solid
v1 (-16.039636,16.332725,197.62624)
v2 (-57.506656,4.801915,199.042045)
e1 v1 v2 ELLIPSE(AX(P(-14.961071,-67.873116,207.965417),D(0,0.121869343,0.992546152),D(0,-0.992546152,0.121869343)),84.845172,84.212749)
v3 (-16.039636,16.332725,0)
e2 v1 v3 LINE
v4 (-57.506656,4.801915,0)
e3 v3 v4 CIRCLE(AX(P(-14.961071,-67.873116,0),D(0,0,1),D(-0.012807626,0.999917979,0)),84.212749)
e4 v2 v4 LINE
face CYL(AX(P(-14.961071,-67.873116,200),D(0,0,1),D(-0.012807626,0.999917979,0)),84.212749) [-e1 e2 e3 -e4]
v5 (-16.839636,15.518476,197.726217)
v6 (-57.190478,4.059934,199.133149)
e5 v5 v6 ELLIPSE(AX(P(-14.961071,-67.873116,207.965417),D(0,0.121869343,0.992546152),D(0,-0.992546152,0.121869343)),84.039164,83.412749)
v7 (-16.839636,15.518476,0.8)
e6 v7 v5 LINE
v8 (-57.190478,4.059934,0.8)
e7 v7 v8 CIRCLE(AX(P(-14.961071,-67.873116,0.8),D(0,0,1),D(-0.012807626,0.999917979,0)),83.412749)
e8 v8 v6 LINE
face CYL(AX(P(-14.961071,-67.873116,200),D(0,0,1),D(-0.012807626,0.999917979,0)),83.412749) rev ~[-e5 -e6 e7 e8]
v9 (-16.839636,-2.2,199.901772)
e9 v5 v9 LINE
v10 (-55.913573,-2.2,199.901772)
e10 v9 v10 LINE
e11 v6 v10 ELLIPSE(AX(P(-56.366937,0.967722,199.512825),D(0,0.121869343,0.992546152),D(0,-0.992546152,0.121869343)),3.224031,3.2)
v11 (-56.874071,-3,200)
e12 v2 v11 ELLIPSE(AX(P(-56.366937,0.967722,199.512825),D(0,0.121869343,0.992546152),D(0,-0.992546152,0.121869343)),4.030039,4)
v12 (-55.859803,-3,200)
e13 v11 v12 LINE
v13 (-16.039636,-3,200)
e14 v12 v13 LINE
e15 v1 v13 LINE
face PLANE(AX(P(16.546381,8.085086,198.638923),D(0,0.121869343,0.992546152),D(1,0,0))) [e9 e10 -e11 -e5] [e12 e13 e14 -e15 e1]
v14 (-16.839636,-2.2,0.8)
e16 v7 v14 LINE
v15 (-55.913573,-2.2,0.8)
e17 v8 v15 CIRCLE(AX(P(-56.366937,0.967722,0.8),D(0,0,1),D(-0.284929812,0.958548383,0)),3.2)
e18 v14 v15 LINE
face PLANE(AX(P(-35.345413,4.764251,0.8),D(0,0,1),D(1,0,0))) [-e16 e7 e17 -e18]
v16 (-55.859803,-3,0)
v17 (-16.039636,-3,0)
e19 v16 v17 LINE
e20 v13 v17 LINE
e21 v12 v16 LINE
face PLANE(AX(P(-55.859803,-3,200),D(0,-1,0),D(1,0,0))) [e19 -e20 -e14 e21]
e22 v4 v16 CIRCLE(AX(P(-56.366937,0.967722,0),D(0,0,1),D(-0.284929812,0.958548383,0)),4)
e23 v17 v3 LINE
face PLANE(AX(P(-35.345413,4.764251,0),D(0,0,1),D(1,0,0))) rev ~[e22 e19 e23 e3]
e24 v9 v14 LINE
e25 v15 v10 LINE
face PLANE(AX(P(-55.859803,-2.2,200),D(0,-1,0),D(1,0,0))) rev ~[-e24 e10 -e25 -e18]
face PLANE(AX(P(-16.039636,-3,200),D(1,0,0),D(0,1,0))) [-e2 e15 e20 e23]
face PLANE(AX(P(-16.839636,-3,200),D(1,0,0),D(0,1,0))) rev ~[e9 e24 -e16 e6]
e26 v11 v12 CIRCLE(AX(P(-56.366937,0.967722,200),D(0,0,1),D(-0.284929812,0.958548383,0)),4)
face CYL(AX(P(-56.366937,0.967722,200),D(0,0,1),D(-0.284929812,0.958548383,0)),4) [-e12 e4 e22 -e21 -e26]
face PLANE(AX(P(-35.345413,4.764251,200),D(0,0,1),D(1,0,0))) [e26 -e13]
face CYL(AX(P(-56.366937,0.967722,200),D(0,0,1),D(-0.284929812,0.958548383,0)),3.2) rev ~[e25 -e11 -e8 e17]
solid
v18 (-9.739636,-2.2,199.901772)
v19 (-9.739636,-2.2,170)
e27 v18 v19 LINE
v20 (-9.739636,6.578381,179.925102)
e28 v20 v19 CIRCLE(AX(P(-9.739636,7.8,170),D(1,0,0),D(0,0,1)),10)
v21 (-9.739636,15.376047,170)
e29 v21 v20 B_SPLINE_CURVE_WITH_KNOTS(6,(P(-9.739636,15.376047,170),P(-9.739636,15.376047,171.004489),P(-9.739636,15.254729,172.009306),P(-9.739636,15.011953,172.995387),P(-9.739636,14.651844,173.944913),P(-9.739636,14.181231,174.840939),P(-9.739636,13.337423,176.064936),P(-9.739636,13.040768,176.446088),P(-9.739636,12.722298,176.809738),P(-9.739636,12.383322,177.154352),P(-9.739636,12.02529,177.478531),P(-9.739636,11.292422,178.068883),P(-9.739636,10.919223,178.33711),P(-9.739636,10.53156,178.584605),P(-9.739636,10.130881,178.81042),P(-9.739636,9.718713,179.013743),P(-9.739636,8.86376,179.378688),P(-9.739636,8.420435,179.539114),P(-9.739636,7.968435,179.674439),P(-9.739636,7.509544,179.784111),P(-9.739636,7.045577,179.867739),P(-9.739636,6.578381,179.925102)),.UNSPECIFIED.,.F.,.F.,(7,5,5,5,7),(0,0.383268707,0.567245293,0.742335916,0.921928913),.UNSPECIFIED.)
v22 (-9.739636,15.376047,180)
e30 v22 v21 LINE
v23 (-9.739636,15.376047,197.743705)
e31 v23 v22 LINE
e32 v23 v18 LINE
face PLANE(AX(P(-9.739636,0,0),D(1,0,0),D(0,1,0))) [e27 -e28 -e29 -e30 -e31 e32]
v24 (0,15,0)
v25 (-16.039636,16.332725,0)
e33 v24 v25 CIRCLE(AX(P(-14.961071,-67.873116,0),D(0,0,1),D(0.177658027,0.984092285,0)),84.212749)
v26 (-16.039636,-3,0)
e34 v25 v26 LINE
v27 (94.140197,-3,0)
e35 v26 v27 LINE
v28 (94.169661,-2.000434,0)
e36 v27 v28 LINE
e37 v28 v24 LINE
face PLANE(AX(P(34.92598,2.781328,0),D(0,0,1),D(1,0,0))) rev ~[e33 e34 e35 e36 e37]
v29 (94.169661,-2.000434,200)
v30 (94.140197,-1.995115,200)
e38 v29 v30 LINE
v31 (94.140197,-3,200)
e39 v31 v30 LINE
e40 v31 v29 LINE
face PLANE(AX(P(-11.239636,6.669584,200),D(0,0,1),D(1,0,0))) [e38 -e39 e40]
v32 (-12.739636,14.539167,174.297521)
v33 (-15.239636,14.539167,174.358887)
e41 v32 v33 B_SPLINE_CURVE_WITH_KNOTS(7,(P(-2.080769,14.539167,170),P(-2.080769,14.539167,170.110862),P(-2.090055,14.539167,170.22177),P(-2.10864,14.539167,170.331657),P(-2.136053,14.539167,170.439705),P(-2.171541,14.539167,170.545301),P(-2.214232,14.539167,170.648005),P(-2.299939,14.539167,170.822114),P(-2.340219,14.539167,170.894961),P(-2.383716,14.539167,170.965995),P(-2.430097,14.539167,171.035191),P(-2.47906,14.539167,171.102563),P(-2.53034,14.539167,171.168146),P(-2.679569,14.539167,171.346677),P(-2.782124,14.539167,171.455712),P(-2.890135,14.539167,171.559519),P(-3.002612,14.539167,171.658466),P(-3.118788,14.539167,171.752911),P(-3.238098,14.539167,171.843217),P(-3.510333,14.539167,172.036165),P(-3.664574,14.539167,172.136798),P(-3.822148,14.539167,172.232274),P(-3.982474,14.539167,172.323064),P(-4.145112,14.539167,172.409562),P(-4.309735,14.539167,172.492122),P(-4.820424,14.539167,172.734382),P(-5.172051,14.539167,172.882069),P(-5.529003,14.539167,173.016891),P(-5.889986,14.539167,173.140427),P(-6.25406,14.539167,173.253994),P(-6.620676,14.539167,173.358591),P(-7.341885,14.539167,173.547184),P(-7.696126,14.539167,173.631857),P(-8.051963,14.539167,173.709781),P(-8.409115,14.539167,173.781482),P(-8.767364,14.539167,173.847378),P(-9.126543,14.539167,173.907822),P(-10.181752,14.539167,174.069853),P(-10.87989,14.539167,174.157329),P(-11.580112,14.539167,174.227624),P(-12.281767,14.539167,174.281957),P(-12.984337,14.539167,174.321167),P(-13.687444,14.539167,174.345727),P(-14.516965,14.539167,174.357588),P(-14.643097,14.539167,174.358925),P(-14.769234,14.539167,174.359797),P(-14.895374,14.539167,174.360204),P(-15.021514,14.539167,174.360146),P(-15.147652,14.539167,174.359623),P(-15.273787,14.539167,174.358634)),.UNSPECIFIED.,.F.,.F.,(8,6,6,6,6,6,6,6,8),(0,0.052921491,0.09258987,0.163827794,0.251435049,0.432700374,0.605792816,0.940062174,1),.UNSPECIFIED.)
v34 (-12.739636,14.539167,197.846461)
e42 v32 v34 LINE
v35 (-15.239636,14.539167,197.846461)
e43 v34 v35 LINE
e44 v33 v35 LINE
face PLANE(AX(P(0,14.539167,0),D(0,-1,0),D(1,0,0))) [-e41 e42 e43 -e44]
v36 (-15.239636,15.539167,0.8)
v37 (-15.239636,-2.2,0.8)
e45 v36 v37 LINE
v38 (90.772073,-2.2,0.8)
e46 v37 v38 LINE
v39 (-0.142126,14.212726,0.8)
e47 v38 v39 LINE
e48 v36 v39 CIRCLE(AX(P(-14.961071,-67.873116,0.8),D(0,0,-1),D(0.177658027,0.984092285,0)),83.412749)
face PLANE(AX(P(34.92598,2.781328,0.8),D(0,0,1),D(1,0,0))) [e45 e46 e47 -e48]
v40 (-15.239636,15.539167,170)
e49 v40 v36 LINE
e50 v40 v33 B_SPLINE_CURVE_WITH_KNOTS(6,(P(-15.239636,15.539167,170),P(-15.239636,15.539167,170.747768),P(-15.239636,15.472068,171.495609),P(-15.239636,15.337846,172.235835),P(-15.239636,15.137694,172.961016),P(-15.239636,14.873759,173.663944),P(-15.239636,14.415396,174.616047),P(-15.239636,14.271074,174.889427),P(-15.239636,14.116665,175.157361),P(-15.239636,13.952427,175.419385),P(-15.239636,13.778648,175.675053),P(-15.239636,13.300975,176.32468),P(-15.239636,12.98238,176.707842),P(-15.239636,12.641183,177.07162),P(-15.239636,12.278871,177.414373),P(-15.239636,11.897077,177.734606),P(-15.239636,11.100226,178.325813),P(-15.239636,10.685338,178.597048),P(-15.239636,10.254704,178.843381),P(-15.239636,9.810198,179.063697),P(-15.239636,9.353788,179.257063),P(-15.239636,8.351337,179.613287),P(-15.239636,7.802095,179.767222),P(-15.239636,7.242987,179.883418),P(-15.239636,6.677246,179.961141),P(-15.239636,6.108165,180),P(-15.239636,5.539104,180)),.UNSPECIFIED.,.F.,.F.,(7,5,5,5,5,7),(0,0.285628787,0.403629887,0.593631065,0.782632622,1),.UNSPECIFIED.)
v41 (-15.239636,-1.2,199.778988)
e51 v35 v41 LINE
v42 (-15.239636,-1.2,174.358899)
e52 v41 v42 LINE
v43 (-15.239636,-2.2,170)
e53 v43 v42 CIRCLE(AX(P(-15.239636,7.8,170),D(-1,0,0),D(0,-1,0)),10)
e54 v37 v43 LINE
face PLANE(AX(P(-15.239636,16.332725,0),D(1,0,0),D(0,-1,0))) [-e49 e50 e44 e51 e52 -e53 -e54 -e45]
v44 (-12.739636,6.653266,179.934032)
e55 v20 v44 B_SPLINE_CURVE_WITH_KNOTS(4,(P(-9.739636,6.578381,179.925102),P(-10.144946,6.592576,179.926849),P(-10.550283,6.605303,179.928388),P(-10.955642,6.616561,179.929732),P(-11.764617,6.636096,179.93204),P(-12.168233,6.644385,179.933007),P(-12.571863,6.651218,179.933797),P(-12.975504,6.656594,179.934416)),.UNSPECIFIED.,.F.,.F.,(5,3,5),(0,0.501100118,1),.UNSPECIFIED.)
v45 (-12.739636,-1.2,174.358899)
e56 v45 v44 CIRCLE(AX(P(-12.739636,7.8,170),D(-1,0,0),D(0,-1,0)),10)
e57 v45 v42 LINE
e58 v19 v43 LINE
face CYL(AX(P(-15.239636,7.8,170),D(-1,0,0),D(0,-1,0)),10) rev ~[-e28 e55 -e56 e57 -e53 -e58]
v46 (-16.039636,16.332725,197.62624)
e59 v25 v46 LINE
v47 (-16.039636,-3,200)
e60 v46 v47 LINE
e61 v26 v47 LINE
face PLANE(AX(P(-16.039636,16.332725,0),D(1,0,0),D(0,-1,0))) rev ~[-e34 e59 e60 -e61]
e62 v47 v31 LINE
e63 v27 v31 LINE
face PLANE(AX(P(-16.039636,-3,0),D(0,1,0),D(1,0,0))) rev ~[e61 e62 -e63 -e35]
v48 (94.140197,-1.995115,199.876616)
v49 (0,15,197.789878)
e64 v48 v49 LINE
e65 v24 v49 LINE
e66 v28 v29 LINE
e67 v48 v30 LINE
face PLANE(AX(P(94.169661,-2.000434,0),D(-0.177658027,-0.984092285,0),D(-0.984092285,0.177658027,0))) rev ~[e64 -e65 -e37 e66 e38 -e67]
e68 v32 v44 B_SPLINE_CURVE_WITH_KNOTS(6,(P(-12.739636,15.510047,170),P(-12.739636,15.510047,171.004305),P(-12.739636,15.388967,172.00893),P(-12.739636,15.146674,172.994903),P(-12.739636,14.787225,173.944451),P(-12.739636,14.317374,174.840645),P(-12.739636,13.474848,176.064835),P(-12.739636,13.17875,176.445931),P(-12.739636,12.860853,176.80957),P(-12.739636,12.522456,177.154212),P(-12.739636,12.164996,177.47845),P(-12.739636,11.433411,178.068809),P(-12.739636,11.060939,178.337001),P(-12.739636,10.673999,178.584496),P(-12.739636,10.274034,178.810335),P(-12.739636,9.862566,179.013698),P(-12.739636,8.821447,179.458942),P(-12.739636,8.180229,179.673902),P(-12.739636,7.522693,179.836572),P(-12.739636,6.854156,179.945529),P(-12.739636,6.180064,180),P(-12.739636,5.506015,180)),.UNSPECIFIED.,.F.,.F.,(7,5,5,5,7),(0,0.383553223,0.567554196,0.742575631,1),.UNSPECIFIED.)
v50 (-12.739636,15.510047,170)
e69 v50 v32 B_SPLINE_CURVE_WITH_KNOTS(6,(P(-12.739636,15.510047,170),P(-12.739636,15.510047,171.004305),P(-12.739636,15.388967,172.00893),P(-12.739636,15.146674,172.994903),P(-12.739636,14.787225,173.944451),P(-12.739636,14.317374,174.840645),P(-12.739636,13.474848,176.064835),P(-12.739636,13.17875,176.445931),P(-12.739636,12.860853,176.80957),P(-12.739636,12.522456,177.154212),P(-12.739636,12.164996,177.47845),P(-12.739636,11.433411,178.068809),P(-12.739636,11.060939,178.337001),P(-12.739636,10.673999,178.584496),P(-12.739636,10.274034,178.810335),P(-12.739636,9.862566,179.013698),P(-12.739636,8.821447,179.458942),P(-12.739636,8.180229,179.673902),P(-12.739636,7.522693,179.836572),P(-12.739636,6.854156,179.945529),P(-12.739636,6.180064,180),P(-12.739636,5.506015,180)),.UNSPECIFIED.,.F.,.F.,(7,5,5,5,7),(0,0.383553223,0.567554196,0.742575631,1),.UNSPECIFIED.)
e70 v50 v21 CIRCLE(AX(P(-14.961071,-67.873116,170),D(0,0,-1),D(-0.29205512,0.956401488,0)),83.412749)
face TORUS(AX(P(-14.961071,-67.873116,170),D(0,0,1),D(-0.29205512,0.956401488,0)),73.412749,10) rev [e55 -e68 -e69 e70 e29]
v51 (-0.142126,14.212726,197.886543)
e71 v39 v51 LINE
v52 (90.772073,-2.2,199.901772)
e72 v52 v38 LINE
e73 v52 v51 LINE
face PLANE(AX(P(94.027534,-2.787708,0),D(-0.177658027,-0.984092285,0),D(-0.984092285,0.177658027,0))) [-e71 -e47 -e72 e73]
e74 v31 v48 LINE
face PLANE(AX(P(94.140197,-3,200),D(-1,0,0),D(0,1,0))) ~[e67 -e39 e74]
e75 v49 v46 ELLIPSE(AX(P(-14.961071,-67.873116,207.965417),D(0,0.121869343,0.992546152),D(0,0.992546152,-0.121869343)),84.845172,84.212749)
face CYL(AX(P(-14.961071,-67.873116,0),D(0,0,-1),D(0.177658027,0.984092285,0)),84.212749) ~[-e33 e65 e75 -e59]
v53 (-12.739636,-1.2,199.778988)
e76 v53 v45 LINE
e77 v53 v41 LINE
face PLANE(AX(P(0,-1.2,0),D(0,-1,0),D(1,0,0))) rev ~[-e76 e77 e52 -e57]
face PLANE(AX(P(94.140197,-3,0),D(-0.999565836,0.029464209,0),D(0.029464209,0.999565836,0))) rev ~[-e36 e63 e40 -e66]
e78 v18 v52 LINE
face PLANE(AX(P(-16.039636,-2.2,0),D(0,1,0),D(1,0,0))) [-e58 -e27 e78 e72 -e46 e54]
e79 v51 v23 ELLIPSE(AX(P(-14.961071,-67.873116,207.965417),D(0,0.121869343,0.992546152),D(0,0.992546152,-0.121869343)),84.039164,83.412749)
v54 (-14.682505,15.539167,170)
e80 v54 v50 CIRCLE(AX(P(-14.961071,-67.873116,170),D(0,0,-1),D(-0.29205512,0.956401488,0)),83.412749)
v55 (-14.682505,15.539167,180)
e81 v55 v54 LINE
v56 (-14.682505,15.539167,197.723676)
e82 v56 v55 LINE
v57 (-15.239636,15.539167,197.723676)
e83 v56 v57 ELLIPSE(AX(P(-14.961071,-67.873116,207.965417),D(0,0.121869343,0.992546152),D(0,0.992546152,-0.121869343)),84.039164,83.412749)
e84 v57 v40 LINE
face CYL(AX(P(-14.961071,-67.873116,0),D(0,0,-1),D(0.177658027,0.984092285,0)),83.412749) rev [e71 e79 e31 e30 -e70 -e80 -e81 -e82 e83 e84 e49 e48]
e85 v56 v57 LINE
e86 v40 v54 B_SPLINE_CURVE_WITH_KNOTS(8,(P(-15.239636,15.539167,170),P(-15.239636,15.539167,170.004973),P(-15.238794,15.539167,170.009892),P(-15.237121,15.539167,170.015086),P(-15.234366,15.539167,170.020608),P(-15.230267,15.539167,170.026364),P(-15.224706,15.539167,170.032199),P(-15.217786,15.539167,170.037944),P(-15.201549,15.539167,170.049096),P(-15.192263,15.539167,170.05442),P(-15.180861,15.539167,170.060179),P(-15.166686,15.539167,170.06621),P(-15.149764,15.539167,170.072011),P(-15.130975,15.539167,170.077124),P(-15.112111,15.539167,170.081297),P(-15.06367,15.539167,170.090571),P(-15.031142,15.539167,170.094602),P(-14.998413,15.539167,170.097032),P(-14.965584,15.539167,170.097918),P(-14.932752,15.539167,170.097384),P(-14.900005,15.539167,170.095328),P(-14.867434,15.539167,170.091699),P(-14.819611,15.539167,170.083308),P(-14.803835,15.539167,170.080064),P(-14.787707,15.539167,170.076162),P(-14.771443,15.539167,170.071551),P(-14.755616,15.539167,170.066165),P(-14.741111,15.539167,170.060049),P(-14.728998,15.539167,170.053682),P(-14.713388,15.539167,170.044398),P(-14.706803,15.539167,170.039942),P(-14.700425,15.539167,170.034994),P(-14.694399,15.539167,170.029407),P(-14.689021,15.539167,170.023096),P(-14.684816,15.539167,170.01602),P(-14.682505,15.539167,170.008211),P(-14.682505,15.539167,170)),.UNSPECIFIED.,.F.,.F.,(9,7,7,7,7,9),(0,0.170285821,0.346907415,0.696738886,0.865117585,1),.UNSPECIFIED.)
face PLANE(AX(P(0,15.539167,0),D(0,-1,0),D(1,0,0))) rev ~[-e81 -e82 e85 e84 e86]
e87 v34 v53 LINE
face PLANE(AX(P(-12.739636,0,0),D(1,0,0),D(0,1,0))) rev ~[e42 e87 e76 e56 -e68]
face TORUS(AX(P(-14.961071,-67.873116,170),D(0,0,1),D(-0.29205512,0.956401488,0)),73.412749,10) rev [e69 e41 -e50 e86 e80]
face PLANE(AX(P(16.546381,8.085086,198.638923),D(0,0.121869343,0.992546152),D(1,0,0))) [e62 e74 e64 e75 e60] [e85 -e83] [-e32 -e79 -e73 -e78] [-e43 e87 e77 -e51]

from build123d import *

# Parameters (mm, degrees)
F1_DEPTH     = 200
F3_DEPTH     = 200
F4_T         = -0.8
F4_2_T       = -0.8
F5_W         = 2.5
F5_H         = 1
F6_DEPTH     = 20
F7_T4_DEPTH  = 5.5
F7_T9_DEPTH  = 30.5
F7_T14_ANGLE = 37.7423343373
F7_T20_ANGLE = 37.7423343373
F8_W         = 155.1876314091
F8_H         = 22.3366669118
F9_ANGLE     = 7


# Not quite as in the source:
# - a fillet or chamfer that OpenCascade refuses, or shapes differently, is made with other operations: its cross-section is extruded or revolved along the edge and cut away or added


with BuildPart() as f1:
    # F0 (on Top) → F1 (new body)
    with BuildSketch(Plane.XY):
        with BuildLine():
            Line((94.1401966023, -3), (94.1696608117, -2.0004341641))
            Line((94.1696608117, -2.0004341641), (0, 15))
            ThreePointArc((0, 15), (-7.9879059152, 16.0504323354), (-16.0396361483, 16.3327251865))
            Line((-16.0396361483, 16.3327251865), (-16.0396361483, -3))
            Line((-16.0396361483, -3), (94.1401966023, -3))
        make_face()
    extrude(amount=F1_DEPTH)

    # F4
    f4_openings = [f1.faces().sort_by_distance(p)[0] for p in [
        (22.614044, 3.891358, 200),
    ]]
    offset(amount=F4_T, openings=f4_openings)

    # F5 (on face) → F6 (join)
    with BuildSketch(Plane.XY.offset(200)):
        Polygon((-12.7396361483, -1.2), (-12.7396361483, -2.2), (-9.7396361483, -2.2), (-9.7396361483, 15.5391672506), (-12.7396361483, 15.5391672506), (-12.7396361483, 14.5391672506), align=None)
        with Locations((-13.9896361483, -1.7)):
            Rectangle(F5_W, F5_H)
        with Locations((-13.9896361483, 15.0391672506)):
            Rectangle(F5_W, F5_H)
    extrude(amount=-F6_DEPTH)

    # F7: fillet of radius 10 on 2 edges, made by hand


with BuildPart() as f3:
    # F2 (on face) → F3 (new body)
    with BuildSketch(Plane.XY.offset(200)):
        with BuildLine():
            Line((-16.0396361483, -3), (-16.0396361483, 16.3327251865))
            ThreePointArc((-16.0396361483, 16.3327251865), (-37.5222437907, 13.2612199418), (-57.5066562048, 4.8019152395))
            ThreePointArc((-57.5066562048, 4.8019152395), (-60.2806962129, 0.1415930949), (-55.8598033977, -3))
            Line((-55.8598033977, -3), (-16.0396361483, -3))
        make_face()
    extrude(amount=-F3_DEPTH)

    # F4#2
    f4_2_openings = [f3.faces().sort_by_distance(p)[0] for p in [
        (-34.83961, 5.023506, 200),
    ]]
    offset(amount=F4_2_T, openings=f4_2_openings, kind=Kind.INTERSECTION)


with BuildPart() as f7_tool2:
    # F7_s3 → F7_t4 (new body)
    with BuildSketch(Plane.YZ.offset(-15.2396361483)):
        with BuildLine():
            ThreePointArc((-2.2, 170), (0.7289321881, 177.0710678119), (7.8, 180))
            Line((7.8, 180), (-2.2, 180))
            Line((-2.2, 180), (-2.2, 170))
        make_face()
    extrude(amount=F7_T4_DEPTH)

    split(bisect_by=Plane.XZ.offset(1.2), keep=Keep.TOP)


with BuildPart() as f1_1:
    add(f1.part)

    # F7_t1: union F7_tool2
    add(f7_tool2.part)


with BuildPart() as f7_tool7:
    # F7_s8 → F7_t9 (new body)
    with BuildSketch(Plane.YZ.offset(-40.2396361483)):
        with BuildLine():
            ThreePointArc((-2.2, 170), (0.7289321881, 177.0710678119), (7.8, 180))
            Line((7.8, 180), (-2.2, 180))
            Line((-2.2, 180), (-2.2, 170))
        make_face()
    extrude(amount=F7_T9_DEPTH)

    split(bisect_by=Plane.YZ.offset(-12.7396361483), keep=Keep.TOP)


with BuildPart() as f1_2:
    add(f1_1.part)

    # F7_t6: union F7_tool7
    add(f7_tool7.part)


with BuildPart() as f7_tool12:
    # F7_s13 → F7_t14 (revolve)
    with BuildSketch(Plane(origin=(-32.6433997569, -9.9682739464, 0), x_dir=(0, 0, 1), z_dir=(-0.9564014883, -0.2920551201, 0))):
        with BuildLine():
            ThreePointArc((170, 22.8682565899), (177.0710678119, 19.9393244018), (180, 12.8682565899))
            Line((180, 12.8682565899), (180, 22.8682565899))
            Line((180, 22.8682565899), (170, 22.8682565899))
        make_face()
    revolve(axis=Axis((-14.9610707823, -67.8731164952, 180), (0, 0, -1)), revolution_arc=F7_T14_ANGLE)

    split(bisect_by=Plane.YZ.offset(-12.7396361483), keep=Keep.TOP)

    split(bisect_by=Plane.YZ.offset(-9.7396361483), keep=Keep.BOTTOM)


with BuildPart() as f1_3:
    add(f1_2.part)

    # F7_t11: union F7_tool12
    add(f7_tool12.part)


with BuildPart() as f7_tool18:
    # F7_s19 → F7_t20 (revolve)
    with BuildSketch(Plane(origin=(-32.6433997569, -9.9682739464, 0), x_dir=(0, 0, 1), z_dir=(-0.9564014883, -0.2920551201, 0))):
        with BuildLine():
            ThreePointArc((170, 22.8682565899), (177.0710678119, 19.9393244018), (180, 12.8682565899))
            Line((180, 12.8682565899), (180, 22.8682565899))
            Line((180, 22.8682565899), (170, 22.8682565899))
        make_face()
    revolve(axis=Axis((-14.9610707823, -67.8731164952, 180), (0, 0, -1)), revolution_arc=F7_T20_ANGLE)

    split(bisect_by=Plane.YZ.offset(-15.2396361483), keep=Keep.TOP)

    split(bisect_by=Plane.XZ.offset(-14.5391672506), keep=Keep.BOTTOM)

    split(bisect_by=Plane.XZ.offset(-15.5391672506), keep=Keep.TOP)

    split(bisect_by=Plane.YZ.offset(-9.7396361483), keep=Keep.BOTTOM)


with BuildPart() as f1_4:
    add(f1_3.part)

    # F7_t17: union F7_tool18
    add(f7_tool18.part)


with BuildPart() as f9_tool:
    # F8 (on face) → F9 (revolve)
    with BuildSketch(Plane.XY.offset(200)):
        with Locations((16.5463808977, 8.1683334559)):
            Rectangle(F8_W, F8_H)
    revolve(axis=Axis((16.5463808977, -3, 200), (-1, 0, 0)), revolution_arc=F9_ANGLE)


with BuildPart() as f1_5:
    add(f1_4.part)

    # F9: cut by f9_tool
    add(f9_tool.part, mode=Mode.SUBTRACT)


with BuildPart() as f3_1:
    add(f3.part)

    # F9: cut by f9_tool
    add(f9_tool.part, mode=Mode.SUBTRACT)


solid = Compound([f1_5.part, f3_1.part])
